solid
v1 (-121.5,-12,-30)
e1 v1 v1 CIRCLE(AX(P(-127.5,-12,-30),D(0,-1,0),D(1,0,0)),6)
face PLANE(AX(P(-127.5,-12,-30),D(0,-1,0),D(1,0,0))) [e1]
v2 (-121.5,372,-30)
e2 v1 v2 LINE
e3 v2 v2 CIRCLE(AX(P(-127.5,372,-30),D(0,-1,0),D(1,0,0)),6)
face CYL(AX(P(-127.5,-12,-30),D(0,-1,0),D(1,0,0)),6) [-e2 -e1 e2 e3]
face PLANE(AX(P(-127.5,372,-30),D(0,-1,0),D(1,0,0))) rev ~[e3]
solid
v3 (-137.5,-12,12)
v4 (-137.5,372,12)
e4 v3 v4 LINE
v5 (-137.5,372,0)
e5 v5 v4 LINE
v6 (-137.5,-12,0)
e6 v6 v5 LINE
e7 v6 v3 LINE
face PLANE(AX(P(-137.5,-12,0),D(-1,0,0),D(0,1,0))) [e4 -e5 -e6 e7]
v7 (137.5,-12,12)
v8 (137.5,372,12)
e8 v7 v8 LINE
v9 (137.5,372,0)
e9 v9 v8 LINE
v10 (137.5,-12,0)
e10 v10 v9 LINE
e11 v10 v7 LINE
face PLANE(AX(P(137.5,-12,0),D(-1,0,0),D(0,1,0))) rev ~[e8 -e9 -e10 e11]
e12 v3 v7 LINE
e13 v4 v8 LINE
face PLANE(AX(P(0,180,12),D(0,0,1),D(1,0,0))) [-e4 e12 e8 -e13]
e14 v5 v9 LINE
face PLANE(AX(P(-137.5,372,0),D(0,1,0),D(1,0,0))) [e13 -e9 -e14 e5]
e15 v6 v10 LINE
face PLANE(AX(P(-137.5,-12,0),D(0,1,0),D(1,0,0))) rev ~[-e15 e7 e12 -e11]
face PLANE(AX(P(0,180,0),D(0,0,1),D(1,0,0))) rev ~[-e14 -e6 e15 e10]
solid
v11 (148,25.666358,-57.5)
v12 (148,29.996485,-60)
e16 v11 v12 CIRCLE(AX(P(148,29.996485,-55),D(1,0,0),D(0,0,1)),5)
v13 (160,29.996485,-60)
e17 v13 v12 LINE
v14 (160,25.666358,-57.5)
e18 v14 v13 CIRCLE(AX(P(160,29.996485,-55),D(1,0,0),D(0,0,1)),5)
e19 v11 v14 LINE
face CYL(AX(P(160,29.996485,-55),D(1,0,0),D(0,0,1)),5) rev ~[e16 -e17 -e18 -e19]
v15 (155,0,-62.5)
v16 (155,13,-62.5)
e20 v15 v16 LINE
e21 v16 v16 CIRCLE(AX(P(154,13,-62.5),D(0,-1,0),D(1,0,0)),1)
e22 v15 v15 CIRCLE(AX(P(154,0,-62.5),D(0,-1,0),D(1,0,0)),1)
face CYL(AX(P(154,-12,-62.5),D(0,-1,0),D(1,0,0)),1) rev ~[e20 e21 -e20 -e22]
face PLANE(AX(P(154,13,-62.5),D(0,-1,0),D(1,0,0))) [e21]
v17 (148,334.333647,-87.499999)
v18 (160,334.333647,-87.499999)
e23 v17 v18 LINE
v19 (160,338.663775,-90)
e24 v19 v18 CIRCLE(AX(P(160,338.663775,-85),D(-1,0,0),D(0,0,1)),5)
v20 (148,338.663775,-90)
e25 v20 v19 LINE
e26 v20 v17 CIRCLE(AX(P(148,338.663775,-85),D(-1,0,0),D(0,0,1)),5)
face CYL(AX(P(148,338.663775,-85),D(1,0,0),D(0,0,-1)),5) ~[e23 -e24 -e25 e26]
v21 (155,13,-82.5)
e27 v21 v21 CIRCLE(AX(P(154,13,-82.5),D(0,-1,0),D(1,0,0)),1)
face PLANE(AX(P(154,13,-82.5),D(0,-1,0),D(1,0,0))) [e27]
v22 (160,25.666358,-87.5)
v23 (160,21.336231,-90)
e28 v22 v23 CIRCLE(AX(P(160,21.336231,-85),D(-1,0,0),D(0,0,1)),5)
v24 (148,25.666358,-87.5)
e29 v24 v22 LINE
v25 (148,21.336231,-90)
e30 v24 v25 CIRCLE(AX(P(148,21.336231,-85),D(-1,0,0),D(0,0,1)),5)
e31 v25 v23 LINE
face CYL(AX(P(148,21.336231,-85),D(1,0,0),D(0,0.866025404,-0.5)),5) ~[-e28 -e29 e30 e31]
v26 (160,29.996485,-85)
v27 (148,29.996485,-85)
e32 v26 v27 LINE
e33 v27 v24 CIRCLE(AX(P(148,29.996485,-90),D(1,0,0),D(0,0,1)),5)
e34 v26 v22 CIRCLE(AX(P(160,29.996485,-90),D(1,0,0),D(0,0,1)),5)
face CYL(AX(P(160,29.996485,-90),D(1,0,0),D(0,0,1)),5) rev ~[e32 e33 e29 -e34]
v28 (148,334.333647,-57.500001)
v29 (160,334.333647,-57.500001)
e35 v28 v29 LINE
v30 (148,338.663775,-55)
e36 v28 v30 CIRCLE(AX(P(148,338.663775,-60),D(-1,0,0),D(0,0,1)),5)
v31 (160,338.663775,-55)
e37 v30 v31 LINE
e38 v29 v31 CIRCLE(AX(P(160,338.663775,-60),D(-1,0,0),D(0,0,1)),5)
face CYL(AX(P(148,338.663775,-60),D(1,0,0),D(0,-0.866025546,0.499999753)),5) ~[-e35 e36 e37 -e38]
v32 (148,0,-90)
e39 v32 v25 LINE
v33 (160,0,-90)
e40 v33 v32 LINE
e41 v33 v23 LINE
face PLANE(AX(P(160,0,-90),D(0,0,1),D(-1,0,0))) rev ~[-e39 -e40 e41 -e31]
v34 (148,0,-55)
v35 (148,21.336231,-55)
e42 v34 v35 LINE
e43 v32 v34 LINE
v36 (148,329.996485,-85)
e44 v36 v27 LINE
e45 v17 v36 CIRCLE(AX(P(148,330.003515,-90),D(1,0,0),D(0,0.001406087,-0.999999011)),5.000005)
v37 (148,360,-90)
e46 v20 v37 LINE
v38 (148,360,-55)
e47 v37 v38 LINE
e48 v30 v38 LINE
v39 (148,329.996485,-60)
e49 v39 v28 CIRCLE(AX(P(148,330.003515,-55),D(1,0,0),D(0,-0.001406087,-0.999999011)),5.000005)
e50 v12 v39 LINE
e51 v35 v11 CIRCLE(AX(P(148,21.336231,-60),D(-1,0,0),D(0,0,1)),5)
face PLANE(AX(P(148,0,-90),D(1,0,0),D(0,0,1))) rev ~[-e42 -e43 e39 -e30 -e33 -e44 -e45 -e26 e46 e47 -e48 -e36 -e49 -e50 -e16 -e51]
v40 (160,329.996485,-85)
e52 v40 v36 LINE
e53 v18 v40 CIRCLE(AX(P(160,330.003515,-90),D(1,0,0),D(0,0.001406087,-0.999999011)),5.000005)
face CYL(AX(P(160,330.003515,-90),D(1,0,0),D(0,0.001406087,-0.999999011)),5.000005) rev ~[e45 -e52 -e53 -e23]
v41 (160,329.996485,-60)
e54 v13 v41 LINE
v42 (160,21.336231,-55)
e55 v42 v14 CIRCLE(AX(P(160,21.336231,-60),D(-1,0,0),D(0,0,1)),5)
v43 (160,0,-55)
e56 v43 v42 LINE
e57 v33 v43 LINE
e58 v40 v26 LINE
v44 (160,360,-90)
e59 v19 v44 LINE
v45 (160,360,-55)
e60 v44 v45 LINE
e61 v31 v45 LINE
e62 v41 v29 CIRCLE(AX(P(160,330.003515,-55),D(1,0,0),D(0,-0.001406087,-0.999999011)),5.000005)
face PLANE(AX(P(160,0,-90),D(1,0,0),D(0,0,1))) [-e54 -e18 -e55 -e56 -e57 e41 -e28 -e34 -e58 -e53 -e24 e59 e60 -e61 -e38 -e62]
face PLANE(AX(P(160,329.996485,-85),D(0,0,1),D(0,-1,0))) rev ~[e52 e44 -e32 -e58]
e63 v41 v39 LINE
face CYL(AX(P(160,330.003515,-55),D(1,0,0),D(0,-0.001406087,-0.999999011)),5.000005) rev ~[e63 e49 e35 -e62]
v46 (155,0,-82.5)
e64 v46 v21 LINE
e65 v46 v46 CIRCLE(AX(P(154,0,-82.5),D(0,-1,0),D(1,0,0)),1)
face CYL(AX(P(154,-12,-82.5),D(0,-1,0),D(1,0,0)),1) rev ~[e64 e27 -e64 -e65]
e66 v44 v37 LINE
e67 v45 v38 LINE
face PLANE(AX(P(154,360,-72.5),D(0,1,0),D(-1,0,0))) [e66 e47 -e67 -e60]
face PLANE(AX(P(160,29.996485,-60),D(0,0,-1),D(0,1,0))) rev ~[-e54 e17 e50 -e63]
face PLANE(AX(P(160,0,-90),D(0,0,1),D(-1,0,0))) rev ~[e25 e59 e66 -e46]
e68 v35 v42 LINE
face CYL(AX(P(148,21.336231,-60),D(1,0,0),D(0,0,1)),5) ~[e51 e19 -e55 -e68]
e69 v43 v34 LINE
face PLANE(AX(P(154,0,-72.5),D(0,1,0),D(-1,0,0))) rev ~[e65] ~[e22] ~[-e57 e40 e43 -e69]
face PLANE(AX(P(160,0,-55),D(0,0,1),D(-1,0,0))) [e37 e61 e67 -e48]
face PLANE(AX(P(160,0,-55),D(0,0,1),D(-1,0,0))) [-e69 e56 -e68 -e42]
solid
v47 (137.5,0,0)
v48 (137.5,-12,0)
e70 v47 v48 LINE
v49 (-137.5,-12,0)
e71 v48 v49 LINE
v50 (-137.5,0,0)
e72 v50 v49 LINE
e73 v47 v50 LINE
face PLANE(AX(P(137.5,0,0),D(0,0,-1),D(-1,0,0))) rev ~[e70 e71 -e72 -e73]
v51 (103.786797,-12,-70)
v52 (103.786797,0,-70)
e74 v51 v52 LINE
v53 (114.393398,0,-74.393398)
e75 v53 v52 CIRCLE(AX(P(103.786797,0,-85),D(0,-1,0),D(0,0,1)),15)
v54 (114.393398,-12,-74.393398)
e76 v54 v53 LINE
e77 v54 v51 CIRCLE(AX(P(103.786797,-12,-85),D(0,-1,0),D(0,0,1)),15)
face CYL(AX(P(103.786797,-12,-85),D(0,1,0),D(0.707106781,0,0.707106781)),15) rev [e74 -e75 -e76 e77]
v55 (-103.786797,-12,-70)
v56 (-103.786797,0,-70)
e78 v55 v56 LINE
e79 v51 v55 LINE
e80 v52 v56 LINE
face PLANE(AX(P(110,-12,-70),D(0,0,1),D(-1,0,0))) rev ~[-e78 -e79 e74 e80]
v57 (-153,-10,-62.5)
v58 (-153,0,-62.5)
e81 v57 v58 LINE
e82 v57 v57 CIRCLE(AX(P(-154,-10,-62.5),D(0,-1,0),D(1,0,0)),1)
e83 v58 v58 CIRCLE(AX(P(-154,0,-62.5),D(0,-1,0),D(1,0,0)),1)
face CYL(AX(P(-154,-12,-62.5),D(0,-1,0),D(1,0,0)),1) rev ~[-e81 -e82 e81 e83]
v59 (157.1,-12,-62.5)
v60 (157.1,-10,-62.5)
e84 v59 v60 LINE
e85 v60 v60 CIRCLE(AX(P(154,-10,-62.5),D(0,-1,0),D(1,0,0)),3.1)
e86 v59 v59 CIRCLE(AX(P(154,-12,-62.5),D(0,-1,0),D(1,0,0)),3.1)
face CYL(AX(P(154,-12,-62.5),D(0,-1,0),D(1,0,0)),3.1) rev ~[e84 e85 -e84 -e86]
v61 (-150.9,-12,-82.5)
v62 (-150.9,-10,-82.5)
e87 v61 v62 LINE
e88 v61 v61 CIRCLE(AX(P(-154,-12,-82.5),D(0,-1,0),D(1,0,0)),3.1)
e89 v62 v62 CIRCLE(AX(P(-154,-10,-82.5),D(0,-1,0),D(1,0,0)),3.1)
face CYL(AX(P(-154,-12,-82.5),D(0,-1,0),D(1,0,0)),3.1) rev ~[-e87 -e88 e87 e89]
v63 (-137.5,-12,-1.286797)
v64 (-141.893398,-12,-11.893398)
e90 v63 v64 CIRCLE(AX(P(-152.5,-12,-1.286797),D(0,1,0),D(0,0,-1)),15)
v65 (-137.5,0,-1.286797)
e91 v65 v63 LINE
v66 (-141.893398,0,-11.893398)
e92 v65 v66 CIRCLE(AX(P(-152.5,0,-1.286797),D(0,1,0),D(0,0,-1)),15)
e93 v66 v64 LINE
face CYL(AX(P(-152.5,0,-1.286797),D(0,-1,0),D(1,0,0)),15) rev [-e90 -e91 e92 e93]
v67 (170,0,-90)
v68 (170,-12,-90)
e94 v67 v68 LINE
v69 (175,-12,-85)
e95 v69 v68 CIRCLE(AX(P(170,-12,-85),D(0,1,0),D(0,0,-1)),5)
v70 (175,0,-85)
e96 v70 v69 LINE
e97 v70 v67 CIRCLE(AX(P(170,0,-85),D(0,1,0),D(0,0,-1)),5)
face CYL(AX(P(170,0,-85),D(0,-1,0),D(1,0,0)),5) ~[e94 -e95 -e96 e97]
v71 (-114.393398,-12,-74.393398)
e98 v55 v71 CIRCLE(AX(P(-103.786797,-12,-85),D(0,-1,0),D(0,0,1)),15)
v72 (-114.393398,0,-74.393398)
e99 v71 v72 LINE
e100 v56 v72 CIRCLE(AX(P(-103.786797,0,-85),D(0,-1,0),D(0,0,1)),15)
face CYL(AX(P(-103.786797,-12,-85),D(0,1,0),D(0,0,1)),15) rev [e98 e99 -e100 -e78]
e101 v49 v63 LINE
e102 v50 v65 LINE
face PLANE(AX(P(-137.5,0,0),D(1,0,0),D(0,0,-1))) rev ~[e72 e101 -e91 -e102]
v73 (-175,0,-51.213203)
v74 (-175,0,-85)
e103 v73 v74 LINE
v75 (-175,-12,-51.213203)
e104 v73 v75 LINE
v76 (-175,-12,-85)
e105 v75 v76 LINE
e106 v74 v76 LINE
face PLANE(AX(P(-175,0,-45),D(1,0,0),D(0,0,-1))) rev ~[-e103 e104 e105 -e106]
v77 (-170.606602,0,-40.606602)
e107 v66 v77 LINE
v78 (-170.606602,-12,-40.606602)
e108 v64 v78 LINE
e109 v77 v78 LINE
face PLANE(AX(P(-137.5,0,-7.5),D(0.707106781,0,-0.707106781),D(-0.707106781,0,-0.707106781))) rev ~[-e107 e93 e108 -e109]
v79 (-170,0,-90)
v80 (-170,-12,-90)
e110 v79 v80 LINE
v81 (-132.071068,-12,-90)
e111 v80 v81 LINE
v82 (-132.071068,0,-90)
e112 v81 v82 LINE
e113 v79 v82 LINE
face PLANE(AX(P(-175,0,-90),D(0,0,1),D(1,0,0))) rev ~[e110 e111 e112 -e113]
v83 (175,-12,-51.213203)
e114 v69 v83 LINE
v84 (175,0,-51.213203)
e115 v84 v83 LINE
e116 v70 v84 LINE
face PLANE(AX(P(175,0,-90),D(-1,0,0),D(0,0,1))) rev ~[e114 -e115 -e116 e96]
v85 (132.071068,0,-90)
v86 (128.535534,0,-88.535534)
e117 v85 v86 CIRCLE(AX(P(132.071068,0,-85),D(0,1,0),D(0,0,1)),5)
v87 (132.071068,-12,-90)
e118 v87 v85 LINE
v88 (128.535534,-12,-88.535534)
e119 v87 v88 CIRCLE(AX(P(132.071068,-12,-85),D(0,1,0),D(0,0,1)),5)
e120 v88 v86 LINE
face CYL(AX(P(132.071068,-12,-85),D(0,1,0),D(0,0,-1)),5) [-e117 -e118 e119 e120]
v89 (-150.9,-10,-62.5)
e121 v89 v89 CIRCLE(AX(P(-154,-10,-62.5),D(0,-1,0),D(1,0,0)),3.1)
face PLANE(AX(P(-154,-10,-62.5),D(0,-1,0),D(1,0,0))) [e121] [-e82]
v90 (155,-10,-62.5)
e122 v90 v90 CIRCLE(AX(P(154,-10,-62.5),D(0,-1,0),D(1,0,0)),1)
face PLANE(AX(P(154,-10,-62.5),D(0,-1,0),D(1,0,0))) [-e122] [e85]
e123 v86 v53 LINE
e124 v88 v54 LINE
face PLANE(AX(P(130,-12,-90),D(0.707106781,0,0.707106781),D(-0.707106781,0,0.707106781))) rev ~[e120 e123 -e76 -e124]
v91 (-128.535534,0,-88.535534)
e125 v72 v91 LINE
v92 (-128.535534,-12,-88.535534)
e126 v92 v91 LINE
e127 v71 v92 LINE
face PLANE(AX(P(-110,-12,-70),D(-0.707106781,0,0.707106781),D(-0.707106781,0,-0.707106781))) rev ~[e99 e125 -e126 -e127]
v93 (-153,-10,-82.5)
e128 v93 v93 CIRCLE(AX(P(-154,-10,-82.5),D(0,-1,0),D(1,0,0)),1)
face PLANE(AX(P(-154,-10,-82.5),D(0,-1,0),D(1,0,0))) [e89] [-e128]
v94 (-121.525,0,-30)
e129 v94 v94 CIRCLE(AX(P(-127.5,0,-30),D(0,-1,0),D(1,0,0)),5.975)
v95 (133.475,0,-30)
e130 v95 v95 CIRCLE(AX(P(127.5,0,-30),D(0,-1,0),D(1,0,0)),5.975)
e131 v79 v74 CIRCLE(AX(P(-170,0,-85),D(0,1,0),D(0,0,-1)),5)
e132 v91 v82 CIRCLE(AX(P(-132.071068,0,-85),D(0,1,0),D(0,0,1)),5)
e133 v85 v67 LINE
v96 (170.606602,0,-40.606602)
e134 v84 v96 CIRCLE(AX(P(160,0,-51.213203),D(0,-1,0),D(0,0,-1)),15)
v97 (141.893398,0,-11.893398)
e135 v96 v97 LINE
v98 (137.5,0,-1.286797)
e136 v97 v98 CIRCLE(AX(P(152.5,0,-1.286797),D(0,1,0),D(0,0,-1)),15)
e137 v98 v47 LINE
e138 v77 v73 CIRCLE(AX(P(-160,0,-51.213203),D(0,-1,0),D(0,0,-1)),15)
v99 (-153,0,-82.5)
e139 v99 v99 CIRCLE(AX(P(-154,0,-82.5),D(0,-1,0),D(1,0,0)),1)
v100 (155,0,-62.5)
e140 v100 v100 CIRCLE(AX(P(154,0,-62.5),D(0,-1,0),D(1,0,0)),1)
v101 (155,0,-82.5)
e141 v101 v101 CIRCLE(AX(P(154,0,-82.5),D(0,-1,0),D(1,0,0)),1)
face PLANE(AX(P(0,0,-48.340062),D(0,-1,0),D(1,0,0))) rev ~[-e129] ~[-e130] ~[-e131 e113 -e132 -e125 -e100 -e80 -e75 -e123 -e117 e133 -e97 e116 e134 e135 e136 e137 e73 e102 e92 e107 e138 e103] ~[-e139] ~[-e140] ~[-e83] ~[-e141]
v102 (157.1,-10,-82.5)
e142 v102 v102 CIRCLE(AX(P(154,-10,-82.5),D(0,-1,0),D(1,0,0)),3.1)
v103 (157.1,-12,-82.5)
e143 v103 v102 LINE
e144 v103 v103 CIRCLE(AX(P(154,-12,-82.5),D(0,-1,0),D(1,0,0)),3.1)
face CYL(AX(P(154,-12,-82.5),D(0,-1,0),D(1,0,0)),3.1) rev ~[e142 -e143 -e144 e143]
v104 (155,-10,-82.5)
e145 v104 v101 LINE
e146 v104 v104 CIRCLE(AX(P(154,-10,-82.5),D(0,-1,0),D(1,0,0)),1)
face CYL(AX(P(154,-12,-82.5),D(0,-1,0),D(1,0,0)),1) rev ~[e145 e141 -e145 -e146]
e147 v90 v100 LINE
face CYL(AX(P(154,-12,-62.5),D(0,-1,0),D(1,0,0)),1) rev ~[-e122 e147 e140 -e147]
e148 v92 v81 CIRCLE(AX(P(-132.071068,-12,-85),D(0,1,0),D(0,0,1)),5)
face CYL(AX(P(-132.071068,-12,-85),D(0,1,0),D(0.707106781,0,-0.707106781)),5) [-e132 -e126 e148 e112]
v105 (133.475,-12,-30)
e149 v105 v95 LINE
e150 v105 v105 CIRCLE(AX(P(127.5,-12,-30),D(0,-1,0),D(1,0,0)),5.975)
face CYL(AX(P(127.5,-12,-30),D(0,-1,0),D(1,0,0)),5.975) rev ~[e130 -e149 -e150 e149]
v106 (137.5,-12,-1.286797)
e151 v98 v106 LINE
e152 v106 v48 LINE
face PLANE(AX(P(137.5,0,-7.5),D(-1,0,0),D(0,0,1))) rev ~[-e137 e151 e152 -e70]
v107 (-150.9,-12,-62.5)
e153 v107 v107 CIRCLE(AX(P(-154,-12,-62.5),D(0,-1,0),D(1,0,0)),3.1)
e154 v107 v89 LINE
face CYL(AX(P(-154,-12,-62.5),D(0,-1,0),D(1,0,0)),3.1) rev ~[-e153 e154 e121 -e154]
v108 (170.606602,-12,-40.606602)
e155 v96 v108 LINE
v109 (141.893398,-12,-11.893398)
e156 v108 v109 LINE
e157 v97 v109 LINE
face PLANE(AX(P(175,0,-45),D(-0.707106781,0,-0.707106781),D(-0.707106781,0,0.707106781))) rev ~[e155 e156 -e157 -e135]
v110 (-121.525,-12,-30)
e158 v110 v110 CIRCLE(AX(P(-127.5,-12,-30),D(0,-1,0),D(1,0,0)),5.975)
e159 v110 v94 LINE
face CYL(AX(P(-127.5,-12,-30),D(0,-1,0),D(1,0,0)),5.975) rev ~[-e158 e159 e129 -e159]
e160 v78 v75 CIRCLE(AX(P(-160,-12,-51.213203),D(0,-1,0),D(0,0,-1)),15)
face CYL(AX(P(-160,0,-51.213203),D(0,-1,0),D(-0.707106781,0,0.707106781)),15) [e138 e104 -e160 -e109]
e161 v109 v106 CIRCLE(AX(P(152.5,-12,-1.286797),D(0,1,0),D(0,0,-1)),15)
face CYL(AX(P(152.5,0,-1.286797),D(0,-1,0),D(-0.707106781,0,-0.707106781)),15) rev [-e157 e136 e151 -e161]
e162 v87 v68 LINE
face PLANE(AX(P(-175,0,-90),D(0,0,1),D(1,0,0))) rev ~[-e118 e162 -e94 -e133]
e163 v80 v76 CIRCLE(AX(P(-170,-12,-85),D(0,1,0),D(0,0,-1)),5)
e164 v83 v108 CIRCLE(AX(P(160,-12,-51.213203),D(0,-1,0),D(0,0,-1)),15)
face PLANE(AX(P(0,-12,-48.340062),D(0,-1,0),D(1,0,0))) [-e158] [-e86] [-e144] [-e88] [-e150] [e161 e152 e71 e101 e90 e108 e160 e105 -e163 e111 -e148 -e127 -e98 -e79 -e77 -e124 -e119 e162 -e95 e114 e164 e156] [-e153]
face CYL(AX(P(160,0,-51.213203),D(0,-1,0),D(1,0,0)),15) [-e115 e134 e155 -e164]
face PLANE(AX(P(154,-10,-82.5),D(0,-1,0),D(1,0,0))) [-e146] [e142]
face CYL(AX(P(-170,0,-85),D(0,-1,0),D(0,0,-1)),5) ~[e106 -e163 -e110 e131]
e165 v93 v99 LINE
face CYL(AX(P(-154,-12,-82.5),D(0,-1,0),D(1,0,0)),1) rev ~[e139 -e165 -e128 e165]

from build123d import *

# Parameters (mm, degrees)
F1_DEPTH  = 12
F2_R      = 5.975
F3_DEPTH  = 25
F4_R      = 6
F5_DEPTH  = 384
F6_W      = 275
F6_H      = 384
F7_DEPTH  = 12
F8_R      = 5
F9_R      = 15
F10_W     = 12
F10_H     = 35
F11_DEPTH = 360
F12_R     = 1
F13_DEPTH = 25
F14_R     = 3.1
F15_DEPTH = 2
F17_DEPTH = 25
F18_R     = 5


with BuildPart() as f1:
    # F0 (on Front) → F1 (new body)
    with BuildSketch(Plane.XZ):
        Polygon((137.5, 0), (-137.5, 0), (-137.5, -7.5), (-175, -45), (-175, -90), (175, -90), (175, -45), (137.5, -7.5), align=None)
    extrude(amount=F1_DEPTH)

    # F2 (on face) → F3 (cut)
    with BuildSketch(Plane.XZ.offset(12)):
        with Locations((-127.5, -30)):
            Circle(F2_R)
        with Locations((127.5, -30)):
            Circle(F2_R)
        Polygon((0, -70), (-110, -70), (-130, -90), (0, -90), (130, -90), (110, -70), align=None)
    extrude(amount=-F3_DEPTH, mode=Mode.SUBTRACT)

    # F8
    f8_edges = [f1.edges().sort_by_distance(p)[0] for p in [
        (-130, -6, -90),
        (130, -6, -90),
        (175, -6, -90),
        (-175, -6, -90),
    ]]
    fillet(f8_edges, radius=F8_R)

    # F9
    f9_edges = [f1.edges().sort_by_distance(p)[0] for p in [
        (-137.5, -6, -7.5),
        (-175, -6, -45),
        (137.5, -6, -7.5),
        (175, -6, -45),
        (-110, -6, -70),
        (110, -6, -70),
    ]]
    fillet(f9_edges, radius=F9_R)


with BuildPart() as f5:
    # F4 (on face) → F5 (new body)
    with BuildSketch(Plane.XZ.offset(12)):
        with Locations((-127.5, -30)):
            Circle(F4_R)
    extrude(amount=-F5_DEPTH)


with BuildPart() as f7:
    # F6 (on face) → F7 (new body)
    with BuildSketch(Plane.XY):
        with Locations((0, 180)):
            Rectangle(F6_W, F6_H)
    extrude(amount=F7_DEPTH)


with BuildPart() as f11:
    # F10 (on face) → F11 (new body)
    with BuildSketch(Plane(origin=(0, 0, 0), x_dir=(-1, 0, 0), z_dir=(0, 1, 0))):
        with Locations((-154, -72.5)):
            Rectangle(F10_W, F10_H)
    extrude(amount=F11_DEPTH)


with BuildPart() as f13_tool:
    # F12 (on face) → F13 (new body)
    with BuildSketch(Plane.XZ.offset(12)):
        with Locations((154, -82.5)):
            Circle(F12_R)
        with Locations((154, -62.5)):
            Circle(F12_R)
        with Locations((-154, -82.5)):
            Circle(F12_R)
        with Locations((-154, -62.5)):
            Circle(F12_R)
    extrude(amount=-F13_DEPTH)


with BuildPart() as f1_1:
    add(f1.part)

    # F13: cut by f13_tool
    add(f13_tool.part, mode=Mode.SUBTRACT)

    # F14 (on face) → F15 (cut)
    with BuildSketch(Plane.XZ.offset(12)):
        with Locations((154, -62.5)):
            Circle(F14_R)
        with Locations((154, -82.5)):
            Circle(F14_R)
        with Locations((-154, -62.5)):
            Circle(F14_R)
        with Locations((-154, -82.5)):
            Circle(F14_R)
    extrude(amount=-F15_DEPTH, mode=Mode.SUBTRACT)


with BuildPart() as f11_1:
    add(f11.part)

    # F13: cut by f13_tool
    add(f13_tool.part, mode=Mode.SUBTRACT)

    # F16 (on face) → F17 (cut)
    with BuildSketch(Plane.YZ.offset(160)):
        with BuildLine():
            Line((330.0105456627, -50), (29.9964847791, -50))
            ThreePointArc((29.9964847791, -50), (24.9964847791, -55), (29.9964847791, -60))
            Line((29.9964847791, -60), (329.9964847791, -60))
            ThreePointArc((329.9964847791, -60), (335.0035152209, -55.0070304418), (330.0105456627, -50))
        make_face()
        with BuildLine():
            ThreePointArc((330.0105456627, -95), (335.0035152209, -89.9929695582), (329.9964847791, -85))
            Line((329.9964847791, -85), (29.9964847791, -85))
            ThreePointArc((29.9964847791, -85), (24.9964847791, -90), (29.9964847791, -95))
            Line((29.9964847791, -95), (330.0105456627, -95))
        make_face()
    extrude(amount=-F17_DEPTH, mode=Mode.SUBTRACT)

    # F18
    f18_edges = [f11_1.edges().sort_by_distance(p)[0] for p in [
        (154, 24.996485, -55),
        (154, 24.996485, -90),
        (154, 335.00352, -90),
        (154, 335.00352, -55),
    ]]
    fillet(f18_edges, radius=F18_R)


solid = Compound([f5.part, f7.part, f1_1.part, f11_1.part])
